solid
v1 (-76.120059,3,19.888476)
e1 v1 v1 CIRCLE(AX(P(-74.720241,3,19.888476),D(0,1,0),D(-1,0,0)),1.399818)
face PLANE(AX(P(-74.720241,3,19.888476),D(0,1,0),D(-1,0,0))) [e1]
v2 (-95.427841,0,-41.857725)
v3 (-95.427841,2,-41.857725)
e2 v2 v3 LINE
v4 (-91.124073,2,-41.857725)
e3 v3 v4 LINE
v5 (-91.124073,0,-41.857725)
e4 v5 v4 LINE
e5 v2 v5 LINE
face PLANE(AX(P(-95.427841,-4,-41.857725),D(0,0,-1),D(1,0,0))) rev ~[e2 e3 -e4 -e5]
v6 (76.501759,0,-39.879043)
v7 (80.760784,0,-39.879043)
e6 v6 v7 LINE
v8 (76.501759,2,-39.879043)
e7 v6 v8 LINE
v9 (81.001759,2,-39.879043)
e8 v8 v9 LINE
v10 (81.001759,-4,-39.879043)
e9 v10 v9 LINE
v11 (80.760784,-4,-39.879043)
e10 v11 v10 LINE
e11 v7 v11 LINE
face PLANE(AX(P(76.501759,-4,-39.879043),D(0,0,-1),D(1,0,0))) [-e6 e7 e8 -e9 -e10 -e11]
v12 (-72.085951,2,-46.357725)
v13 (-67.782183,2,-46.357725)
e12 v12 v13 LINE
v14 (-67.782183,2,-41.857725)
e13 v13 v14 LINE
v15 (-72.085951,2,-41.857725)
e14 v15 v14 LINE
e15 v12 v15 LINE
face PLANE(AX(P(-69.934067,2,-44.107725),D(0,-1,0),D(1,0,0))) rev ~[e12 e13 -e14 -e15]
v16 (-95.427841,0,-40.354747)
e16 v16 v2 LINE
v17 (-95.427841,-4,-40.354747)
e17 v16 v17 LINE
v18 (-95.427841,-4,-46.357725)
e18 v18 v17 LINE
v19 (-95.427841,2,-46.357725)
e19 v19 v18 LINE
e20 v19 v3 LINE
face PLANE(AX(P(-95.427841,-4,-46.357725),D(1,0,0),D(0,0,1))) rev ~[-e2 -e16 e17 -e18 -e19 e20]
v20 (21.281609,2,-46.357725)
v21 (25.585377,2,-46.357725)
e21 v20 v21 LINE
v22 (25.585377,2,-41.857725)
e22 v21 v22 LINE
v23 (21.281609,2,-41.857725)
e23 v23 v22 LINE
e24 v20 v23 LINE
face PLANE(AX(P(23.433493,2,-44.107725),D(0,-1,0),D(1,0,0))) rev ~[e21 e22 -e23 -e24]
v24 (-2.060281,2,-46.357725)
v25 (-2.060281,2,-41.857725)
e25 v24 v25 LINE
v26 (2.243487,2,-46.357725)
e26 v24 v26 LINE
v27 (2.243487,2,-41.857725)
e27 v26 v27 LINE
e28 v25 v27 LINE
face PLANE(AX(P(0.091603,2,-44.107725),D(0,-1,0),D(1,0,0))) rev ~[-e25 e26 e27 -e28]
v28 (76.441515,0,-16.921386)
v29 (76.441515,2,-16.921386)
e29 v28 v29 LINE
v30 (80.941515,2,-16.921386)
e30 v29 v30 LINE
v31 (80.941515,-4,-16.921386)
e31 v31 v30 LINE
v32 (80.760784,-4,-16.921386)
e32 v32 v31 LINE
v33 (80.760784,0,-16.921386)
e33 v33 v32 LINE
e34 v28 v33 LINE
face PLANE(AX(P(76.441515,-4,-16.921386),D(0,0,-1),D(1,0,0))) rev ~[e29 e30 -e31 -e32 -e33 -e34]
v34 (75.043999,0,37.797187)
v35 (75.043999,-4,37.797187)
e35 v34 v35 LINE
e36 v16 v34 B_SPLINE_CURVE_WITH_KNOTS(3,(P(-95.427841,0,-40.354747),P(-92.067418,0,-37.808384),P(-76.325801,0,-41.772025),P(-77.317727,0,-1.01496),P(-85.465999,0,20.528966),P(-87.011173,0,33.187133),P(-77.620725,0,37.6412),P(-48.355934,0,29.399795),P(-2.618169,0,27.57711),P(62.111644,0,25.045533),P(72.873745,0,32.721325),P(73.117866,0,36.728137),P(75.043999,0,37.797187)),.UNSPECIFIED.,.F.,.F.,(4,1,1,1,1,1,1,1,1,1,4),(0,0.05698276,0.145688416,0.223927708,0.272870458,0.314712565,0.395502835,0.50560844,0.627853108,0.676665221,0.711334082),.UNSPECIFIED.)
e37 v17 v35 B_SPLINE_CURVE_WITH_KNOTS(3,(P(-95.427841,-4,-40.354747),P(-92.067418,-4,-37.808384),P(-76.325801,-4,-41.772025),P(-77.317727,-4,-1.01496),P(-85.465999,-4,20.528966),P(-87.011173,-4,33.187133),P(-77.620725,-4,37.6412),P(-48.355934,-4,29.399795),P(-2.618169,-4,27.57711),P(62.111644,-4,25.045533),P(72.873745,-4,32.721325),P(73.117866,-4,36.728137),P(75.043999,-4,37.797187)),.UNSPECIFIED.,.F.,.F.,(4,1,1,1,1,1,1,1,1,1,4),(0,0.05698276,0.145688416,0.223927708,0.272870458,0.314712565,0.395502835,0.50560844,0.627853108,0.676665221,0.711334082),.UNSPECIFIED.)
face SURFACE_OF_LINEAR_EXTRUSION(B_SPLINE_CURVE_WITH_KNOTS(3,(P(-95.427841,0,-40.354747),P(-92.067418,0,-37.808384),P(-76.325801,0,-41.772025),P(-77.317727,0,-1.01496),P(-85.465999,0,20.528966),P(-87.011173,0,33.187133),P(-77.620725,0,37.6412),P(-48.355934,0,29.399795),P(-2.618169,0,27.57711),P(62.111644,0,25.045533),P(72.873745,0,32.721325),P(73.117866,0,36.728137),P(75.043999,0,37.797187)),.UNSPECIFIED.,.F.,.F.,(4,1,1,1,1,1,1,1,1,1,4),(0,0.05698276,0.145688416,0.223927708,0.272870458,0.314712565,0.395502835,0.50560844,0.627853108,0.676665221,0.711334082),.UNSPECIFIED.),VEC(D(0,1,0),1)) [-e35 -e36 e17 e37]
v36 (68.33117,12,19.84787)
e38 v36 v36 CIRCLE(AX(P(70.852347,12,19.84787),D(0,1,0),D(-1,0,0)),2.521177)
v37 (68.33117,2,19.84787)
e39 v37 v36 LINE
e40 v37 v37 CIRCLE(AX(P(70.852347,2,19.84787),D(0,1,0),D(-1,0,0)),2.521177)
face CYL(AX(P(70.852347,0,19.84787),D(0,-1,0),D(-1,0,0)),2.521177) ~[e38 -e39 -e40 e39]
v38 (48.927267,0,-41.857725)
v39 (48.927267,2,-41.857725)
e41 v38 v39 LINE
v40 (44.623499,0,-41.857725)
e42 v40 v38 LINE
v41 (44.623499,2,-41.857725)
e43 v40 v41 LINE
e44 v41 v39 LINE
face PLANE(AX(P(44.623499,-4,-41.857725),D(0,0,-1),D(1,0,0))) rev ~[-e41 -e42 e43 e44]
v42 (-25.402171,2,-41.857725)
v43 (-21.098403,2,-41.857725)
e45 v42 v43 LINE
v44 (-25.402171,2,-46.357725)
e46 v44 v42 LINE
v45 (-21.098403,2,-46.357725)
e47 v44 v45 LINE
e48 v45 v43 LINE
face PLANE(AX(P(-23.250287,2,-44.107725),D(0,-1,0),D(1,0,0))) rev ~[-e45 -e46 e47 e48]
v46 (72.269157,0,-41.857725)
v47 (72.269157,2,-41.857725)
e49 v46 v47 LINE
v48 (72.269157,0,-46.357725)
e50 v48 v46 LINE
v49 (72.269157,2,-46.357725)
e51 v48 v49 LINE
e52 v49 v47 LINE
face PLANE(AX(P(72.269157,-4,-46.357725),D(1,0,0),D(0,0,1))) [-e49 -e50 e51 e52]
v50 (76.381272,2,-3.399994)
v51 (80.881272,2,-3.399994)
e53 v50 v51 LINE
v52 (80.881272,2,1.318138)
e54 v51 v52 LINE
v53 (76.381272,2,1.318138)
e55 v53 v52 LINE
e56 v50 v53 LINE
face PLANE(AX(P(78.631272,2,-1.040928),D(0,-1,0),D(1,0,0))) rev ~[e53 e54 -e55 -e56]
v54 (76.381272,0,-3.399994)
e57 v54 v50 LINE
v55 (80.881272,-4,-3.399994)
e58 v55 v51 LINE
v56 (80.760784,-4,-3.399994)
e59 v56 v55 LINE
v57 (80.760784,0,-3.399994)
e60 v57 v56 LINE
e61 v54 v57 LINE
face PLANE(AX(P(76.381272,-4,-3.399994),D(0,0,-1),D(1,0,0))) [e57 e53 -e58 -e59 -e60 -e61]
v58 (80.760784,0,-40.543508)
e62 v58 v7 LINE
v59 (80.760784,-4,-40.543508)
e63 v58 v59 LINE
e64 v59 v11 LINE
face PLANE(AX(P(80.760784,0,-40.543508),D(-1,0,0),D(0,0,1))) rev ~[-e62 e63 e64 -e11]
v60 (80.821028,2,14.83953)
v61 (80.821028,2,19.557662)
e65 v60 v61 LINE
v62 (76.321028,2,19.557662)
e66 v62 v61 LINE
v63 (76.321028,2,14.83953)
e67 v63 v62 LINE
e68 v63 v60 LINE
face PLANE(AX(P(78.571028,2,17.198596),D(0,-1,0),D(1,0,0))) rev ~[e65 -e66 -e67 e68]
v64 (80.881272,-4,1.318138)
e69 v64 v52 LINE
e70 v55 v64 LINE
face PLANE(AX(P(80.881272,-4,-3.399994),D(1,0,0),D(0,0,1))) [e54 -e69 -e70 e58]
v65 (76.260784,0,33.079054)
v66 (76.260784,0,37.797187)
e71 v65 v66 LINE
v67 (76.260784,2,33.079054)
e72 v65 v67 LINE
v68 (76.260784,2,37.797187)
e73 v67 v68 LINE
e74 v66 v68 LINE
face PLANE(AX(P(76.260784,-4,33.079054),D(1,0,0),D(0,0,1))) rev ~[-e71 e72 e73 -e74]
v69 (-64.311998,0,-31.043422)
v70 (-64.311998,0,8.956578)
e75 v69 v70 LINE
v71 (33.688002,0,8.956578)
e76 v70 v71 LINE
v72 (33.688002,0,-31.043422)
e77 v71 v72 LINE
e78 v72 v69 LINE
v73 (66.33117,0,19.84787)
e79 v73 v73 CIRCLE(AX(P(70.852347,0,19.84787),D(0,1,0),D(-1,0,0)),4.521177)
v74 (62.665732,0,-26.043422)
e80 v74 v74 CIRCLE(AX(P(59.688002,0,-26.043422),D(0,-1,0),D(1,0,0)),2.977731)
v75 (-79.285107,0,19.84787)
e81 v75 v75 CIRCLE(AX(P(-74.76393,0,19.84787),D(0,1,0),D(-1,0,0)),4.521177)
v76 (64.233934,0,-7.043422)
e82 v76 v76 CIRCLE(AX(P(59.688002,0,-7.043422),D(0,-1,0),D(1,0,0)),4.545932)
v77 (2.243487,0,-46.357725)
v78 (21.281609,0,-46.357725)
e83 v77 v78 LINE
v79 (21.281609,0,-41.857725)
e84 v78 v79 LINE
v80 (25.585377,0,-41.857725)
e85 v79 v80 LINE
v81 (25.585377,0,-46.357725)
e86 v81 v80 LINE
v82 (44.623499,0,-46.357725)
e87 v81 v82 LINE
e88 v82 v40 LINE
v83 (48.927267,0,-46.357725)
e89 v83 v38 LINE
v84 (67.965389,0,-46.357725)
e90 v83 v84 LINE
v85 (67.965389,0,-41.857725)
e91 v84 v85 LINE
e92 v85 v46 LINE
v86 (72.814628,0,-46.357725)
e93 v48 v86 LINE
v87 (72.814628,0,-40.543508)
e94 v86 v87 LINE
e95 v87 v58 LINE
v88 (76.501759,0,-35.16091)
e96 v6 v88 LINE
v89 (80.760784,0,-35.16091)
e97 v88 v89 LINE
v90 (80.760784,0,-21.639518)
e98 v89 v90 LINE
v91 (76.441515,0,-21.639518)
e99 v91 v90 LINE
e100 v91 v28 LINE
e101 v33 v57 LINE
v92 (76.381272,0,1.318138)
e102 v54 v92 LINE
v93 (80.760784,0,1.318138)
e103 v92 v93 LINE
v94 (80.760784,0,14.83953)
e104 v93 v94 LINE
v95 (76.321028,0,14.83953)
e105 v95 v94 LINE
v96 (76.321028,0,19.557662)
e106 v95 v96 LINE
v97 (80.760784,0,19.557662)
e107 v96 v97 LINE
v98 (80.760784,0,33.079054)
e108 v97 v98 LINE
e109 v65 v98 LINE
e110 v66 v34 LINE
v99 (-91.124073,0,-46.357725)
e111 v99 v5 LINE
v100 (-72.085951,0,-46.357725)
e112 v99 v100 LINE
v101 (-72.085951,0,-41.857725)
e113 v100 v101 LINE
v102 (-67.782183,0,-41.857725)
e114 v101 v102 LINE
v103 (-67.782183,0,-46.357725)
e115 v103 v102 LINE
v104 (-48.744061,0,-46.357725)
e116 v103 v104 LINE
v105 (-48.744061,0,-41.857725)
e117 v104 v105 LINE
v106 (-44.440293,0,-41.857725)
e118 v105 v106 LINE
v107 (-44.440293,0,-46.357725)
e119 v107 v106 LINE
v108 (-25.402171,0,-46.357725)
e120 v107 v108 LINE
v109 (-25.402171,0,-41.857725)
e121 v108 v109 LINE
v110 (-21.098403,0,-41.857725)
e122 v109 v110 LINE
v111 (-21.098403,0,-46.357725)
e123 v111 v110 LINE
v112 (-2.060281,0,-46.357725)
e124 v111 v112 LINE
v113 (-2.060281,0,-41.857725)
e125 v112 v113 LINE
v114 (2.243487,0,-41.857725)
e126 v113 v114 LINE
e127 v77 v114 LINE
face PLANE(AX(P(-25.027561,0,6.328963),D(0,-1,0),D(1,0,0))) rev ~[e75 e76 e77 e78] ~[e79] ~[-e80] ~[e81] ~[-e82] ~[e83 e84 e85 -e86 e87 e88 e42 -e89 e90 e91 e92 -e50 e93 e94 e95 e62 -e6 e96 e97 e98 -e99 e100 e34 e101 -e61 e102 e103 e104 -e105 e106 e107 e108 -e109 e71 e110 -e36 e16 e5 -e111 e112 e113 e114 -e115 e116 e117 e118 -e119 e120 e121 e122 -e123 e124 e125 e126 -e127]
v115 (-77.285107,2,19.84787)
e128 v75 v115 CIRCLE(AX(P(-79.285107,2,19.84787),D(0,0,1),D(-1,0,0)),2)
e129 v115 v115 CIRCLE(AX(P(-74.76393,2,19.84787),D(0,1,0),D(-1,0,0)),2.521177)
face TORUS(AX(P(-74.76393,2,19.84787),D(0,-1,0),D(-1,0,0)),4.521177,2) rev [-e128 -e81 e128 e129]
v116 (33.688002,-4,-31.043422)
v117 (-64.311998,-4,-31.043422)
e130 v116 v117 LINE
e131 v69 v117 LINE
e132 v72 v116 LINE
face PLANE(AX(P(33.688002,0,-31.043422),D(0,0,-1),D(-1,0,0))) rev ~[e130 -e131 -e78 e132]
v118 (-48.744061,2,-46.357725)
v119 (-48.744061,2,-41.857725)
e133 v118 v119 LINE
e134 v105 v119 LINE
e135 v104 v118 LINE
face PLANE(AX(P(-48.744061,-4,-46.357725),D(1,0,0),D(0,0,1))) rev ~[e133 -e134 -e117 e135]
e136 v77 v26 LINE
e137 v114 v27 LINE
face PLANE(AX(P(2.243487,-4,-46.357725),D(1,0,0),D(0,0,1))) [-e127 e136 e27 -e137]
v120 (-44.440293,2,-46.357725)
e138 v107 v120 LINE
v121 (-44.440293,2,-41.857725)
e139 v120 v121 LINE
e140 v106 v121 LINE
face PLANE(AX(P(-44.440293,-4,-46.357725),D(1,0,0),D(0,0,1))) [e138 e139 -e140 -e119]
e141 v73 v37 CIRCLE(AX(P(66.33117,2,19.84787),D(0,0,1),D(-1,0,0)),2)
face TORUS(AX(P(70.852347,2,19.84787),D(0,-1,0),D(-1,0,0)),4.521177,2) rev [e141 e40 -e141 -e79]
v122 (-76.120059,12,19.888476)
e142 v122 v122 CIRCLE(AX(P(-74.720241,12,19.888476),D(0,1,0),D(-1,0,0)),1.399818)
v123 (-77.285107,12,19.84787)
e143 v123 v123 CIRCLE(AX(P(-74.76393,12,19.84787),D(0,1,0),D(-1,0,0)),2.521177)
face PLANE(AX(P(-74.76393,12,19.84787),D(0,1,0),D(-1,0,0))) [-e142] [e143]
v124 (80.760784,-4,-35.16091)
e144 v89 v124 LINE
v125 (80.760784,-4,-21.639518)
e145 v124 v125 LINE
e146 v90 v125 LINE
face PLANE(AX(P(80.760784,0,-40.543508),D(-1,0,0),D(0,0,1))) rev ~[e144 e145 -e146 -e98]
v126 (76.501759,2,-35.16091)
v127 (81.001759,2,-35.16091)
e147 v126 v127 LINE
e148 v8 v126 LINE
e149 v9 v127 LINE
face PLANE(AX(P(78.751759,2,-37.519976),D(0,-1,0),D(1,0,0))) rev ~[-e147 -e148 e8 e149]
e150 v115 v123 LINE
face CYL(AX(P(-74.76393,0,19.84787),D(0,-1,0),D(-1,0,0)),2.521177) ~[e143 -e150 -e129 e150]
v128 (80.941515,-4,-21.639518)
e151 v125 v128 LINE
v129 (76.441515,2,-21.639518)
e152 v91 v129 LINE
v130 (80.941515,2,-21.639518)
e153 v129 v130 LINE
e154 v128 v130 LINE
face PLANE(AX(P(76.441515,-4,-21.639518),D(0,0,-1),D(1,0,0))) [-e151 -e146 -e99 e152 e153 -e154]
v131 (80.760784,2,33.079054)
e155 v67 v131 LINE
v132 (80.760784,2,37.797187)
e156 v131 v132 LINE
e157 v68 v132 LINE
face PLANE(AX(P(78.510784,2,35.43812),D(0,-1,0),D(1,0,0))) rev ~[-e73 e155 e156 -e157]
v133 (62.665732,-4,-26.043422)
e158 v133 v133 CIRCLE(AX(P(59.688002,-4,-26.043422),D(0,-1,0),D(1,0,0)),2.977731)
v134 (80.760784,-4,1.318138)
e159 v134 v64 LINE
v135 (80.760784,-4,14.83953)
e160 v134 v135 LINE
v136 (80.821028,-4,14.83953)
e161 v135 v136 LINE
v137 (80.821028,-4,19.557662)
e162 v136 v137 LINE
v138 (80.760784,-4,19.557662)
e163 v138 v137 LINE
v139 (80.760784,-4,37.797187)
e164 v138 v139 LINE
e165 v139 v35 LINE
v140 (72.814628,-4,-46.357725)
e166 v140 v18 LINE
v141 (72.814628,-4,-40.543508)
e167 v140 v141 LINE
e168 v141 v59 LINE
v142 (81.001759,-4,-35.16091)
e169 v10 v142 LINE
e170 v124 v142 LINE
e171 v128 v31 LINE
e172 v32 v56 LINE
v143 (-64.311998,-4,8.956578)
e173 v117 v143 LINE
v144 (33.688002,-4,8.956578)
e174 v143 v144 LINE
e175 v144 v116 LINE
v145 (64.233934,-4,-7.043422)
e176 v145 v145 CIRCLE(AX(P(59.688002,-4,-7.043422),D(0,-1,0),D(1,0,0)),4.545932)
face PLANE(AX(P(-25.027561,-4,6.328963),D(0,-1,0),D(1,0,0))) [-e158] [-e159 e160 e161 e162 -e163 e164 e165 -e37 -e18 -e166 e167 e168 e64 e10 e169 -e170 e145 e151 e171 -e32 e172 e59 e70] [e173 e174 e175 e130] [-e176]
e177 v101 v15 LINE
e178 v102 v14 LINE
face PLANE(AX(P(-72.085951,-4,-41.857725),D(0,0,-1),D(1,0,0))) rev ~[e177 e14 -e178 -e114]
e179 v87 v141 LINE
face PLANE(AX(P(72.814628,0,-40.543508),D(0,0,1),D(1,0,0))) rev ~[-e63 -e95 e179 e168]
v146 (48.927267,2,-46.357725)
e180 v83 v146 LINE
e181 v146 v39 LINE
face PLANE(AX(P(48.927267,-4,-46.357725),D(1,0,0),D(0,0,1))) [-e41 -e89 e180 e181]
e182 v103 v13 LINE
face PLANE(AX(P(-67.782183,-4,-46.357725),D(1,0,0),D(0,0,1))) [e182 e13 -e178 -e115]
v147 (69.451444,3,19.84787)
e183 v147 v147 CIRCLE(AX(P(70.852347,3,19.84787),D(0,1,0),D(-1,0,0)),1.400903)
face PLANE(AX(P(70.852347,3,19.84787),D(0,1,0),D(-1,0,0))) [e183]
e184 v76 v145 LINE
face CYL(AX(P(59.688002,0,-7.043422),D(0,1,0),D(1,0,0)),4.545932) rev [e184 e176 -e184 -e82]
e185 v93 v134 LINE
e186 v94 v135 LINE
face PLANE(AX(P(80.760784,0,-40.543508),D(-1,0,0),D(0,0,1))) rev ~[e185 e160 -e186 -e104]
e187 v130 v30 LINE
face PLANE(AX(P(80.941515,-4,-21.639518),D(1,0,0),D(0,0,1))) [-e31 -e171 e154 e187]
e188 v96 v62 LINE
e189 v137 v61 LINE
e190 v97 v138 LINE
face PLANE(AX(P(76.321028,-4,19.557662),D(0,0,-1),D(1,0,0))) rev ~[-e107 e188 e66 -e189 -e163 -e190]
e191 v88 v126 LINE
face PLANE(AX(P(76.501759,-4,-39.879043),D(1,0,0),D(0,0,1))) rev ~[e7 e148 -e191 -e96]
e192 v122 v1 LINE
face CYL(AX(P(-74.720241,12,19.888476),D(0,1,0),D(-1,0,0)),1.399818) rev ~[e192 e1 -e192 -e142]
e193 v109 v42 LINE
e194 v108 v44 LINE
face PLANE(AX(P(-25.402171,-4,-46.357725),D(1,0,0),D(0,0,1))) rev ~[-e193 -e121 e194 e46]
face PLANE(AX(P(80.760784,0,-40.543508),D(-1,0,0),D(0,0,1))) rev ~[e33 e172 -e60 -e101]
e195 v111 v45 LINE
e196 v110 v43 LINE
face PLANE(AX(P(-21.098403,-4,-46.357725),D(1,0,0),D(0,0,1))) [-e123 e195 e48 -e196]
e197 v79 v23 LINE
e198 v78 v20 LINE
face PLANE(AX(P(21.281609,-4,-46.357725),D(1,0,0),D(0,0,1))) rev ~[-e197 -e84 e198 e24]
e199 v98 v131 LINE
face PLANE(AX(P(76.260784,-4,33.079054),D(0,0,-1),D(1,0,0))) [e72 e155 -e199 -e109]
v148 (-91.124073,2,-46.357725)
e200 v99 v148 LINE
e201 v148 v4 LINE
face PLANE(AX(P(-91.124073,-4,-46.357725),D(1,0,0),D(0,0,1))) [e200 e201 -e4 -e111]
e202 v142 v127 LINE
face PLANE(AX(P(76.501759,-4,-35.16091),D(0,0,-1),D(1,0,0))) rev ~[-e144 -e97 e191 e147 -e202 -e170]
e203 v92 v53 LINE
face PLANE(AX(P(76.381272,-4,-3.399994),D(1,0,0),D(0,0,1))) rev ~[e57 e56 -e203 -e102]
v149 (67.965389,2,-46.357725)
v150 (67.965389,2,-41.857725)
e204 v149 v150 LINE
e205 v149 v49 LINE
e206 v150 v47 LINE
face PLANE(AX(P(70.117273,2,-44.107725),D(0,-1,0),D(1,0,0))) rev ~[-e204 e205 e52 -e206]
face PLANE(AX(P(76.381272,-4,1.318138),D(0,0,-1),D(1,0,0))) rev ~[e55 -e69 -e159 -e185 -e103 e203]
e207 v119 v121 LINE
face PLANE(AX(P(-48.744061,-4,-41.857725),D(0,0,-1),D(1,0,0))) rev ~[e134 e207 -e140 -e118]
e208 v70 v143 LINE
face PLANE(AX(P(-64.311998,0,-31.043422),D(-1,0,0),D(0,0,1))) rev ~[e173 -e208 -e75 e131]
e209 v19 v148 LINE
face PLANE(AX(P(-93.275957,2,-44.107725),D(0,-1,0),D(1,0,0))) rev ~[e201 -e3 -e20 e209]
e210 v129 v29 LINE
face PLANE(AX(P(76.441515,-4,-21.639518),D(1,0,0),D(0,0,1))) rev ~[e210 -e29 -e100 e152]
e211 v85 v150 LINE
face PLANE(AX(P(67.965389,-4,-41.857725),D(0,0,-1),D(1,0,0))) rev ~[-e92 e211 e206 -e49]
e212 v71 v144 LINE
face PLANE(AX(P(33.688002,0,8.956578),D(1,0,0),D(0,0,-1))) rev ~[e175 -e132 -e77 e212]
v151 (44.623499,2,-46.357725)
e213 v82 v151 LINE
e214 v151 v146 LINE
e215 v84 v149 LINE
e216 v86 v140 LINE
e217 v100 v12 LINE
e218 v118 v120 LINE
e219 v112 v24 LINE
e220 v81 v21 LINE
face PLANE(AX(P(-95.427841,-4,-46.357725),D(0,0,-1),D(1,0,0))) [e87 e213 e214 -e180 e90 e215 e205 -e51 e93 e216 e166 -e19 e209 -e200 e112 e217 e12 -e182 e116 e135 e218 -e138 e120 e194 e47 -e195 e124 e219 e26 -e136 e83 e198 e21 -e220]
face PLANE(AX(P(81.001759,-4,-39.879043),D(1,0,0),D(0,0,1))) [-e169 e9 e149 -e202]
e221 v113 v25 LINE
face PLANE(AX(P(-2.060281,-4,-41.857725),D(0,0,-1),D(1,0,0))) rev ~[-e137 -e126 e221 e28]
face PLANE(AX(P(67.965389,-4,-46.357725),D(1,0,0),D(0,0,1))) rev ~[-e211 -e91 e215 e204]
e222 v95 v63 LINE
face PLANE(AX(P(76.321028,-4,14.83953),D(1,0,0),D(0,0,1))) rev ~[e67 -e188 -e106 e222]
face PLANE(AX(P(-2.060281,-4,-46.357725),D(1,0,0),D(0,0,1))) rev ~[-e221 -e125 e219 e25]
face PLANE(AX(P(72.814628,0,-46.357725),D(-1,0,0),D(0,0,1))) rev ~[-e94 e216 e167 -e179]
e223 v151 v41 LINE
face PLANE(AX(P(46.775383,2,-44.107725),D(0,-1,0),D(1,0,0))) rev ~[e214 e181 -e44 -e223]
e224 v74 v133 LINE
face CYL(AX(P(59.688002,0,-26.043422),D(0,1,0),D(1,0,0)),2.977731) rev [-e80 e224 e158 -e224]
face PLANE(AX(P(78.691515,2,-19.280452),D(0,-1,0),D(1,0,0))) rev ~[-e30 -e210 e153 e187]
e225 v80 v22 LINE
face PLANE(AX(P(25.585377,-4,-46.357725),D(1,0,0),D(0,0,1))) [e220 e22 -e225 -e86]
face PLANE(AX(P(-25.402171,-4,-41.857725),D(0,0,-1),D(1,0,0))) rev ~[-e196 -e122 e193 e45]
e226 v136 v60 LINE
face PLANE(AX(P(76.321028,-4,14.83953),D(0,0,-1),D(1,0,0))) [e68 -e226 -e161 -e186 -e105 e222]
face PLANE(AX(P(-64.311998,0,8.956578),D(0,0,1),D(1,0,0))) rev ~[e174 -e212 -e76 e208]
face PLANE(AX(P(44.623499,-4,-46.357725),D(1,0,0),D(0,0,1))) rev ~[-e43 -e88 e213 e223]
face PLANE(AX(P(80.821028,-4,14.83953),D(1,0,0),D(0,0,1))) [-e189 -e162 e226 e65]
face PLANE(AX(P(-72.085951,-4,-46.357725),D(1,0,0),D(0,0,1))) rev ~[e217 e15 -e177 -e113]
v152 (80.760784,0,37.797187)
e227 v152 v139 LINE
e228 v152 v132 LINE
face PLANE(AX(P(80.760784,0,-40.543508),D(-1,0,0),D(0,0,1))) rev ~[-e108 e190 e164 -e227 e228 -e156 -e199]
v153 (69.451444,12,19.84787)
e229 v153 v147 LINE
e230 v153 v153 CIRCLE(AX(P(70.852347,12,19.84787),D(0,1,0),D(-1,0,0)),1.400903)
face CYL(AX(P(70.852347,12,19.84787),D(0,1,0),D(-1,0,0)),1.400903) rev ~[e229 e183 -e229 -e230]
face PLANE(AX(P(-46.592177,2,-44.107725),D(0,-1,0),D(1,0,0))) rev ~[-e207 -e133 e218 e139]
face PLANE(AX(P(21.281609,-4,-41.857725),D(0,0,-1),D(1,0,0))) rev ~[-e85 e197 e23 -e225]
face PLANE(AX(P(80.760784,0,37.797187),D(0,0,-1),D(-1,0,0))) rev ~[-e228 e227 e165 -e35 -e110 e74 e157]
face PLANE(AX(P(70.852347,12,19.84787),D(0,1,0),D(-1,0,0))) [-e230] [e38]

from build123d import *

# Parameters (mm, degrees)
F0_R     = 2.9777305249
F0_R_2   = 4.5459324983
F1_DEPTH = 4
F2_W     = 4.3037682772
F2_H     = 4.5
F2_W_2   = 4.5
F2_H_2   = 4.7181323171
F3_DEPTH = 6
F4_R     = 2.5211771025
F5_DEPTH = 12
F6_R     = 1.4009025459
F6_R_2   = 1.3998178409
F7_DEPTH = 9
F8_R     = 2


with BuildPart() as f1:
    # F0 (on Front) → F1 (new body)
    with BuildSketch(Plane.XZ):
        with BuildLine():
            Line((-95.4278409481, -40.3547473252), (-95.4278409481, -46.3577248156))
            Line((-95.4278409481, -46.3577248156), (-90.6878511674, -46.3577248156))
            add(Edge.make_bspline(
                [(-47.2556848285, -31.0434222525), (-66.2071872784, -39.2541441109), (-82.2106525971, -45.1740109986), (-90.6878511674, -46.3577248156)],
                knots=[0.895739685, 0.895739685, 0.895739685, 0.895739685, 0.9495042682, 0.9495042682, 0.9495042682, 0.9495042682], degree=3))
            Line((-47.2556848285, -31.0434222525), (-64.3119981289, -31.0434222525))
            Line((-64.3119981289, -31.0434222525), (-64.3119981289, 8.9565777475))
            Line((-64.3119981289, 8.9565777475), (33.6880018711, 8.9565777475))
            Line((33.6880018711, 8.9565777475), (33.6880018711, 8.3636850741))
            add(Edge.make_bspline(
                [(80.7607844472, 37.7971865237), (79.9293326803, 34.4997677685), (59.9654214438, 22.406338735), (33.6880018711, 8.3636850741)],
                knots=[0.7480183731, 0.7480183731, 0.7480183731, 0.7480183731, 0.8237972081, 0.8237972081, 0.8237972081, 0.8237972081], degree=3))
            Line((80.7607844472, 37.7971865237), (75.0439986587, 37.7971865237))
            add(Edge.make_bspline(
                [(-95.4278409481, -40.3547473252), (-92.0674179131, -37.808383953), (-76.3258009125, -41.7720249364), (-77.3177273216, -1.014959725), (-85.4659986726, 20.5289663767), (-87.0111734686, 33.1871332132), (-77.6207246502, 37.641199644), (-48.3559341751, 29.3997954409), (-2.6181687816, 27.577109738), (62.1116438555, 25.0455332175), (72.8737447638, 32.721325141), (73.1178660635, 36.728137061), (75.0439986587, 37.7971865237)],
                knots=[0, 0, 0, 0, 0.0569827595, 0.1456884161, 0.223927708, 0.2728704579, 0.3147125654, 0.3955028348, 0.5056084396, 0.6278531079, 0.6766652208, 0.7113340821, 0.7113340821, 0.7113340821, 0.7113340821], degree=3))
        make_face()
        with BuildLine():
            add(Edge.make_bspline(
                [(-47.2556848285, -31.0434222525), (-66.2071872784, -39.2541441109), (-82.2106525971, -45.1740109986), (-90.6878511674, -46.3577248156)],
                knots=[0.895739685, 0.895739685, 0.895739685, 0.895739685, 0.9495042682, 0.9495042682, 0.9495042682, 0.9495042682], degree=3))
            Line((-90.6878511674, -46.3577248156), (72.8146284819, -46.3577248156))
            Line((72.8146284819, -46.3577248156), (72.8146284819, -40.5435077846))
            Line((72.8146284819, -40.5435077846), (80.7607844472, -40.5435077846))
            Line((80.7607844472, -40.5435077846), (80.7607844472, 37.7971865237))
            add(Edge.make_bspline(
                [(80.7607844472, 37.7971865237), (79.9293326803, 34.4997677685), (59.9654214438, 22.406338735), (33.6880018711, 8.3636850741)],
                knots=[0.7480183731, 0.7480183731, 0.7480183731, 0.7480183731, 0.8237972081, 0.8237972081, 0.8237972081, 0.8237972081], degree=3))
            Line((33.6880018711, 8.3636850741), (33.6880018711, -31.0434222525))
            Line((33.6880018711, -31.0434222525), (-47.2556848285, -31.0434222525))
        make_face()
        with Locations((59.6880018711, -26.0434222525)):
            Circle(F0_R, mode=Mode.SUBTRACT)
        with Locations((59.6880018711, -7.0434222525)):
            Circle(F0_R_2, mode=Mode.SUBTRACT)
    extrude(amount=F1_DEPTH)

    # F2 (on face) → F3 (join)
    with BuildSketch(Plane.XZ.offset(4)):
        with Locations((-93.2759568095, -44.1077248156)):
            Rectangle(F2_W, F2_H)
        with Locations((-69.9340668095, -44.1077248156)):
            Rectangle(F2_W, F2_H)
        with Locations((-46.5921768095, -44.1077248156)):
            Rectangle(F2_W, F2_H)
        with Locations((-23.2502868095, -44.1077248156)):
            Rectangle(F2_W, F2_H)
        with Locations((0.0916031905, -44.1077248156)):
            Rectangle(F2_W, F2_H)
        with Locations((23.4334931905, -44.1077248156)):
            Rectangle(F2_W, F2_H)
        with Locations((46.7753831905, -44.1077248156)):
            Rectangle(F2_W, F2_H)
        with Locations((70.1172731905, -44.1077248156)):
            Rectangle(F2_W, F2_H)
        with Locations((78.5107844472, 35.4381203651)):
            Rectangle(F2_W_2, F2_H_2)
        with Locations((78.5710280145, 17.1985961585)):
            Rectangle(F2_W_2, F2_H_2)
        with Locations((78.6312715817, -1.0409280481)):
            Rectangle(F2_W_2, F2_H_2)
        with Locations((78.691515149, -19.2804522547)):
            Rectangle(F2_W_2, F2_H_2)
        with Locations((78.7517587162, -37.5199764613)):
            Rectangle(F2_W_2, F2_H_2)
    extrude(amount=-F3_DEPTH)

    # F4 (on face) → F5 (join)
    with BuildSketch(Plane(origin=(0, 0, 0), x_dir=(-1, 0, 0), z_dir=(0, 1, 0))):
        with Locations((-70.8523467183, 19.847869873)):
            Circle(F4_R)
        with Locations((74.7639298199, 19.847869873)):
            Circle(F4_R)
    extrude(amount=F5_DEPTH)

    # F6 (on face) → F7 (cut)
    with BuildSketch(Plane(origin=(0, 12, 0), x_dir=(-1, 0, 0), z_dir=(0, 1, 0))):
        with Locations((-70.8523467183, 19.847869873)):
            Circle(F6_R)
        with Locations((74.7202411294, 19.8884755373)):
            Circle(F6_R_2)
    extrude(amount=-F7_DEPTH, mode=Mode.SUBTRACT)

    # F8
    f8_edges = [f1.edges().sort_by_distance(p)[0] for p in [
        (73.373524, 0, 19.84787),
        (-72.242753, 0, 19.84787),
    ]]
    fillet(f8_edges, radius=F8_R)


solid = f1.part
